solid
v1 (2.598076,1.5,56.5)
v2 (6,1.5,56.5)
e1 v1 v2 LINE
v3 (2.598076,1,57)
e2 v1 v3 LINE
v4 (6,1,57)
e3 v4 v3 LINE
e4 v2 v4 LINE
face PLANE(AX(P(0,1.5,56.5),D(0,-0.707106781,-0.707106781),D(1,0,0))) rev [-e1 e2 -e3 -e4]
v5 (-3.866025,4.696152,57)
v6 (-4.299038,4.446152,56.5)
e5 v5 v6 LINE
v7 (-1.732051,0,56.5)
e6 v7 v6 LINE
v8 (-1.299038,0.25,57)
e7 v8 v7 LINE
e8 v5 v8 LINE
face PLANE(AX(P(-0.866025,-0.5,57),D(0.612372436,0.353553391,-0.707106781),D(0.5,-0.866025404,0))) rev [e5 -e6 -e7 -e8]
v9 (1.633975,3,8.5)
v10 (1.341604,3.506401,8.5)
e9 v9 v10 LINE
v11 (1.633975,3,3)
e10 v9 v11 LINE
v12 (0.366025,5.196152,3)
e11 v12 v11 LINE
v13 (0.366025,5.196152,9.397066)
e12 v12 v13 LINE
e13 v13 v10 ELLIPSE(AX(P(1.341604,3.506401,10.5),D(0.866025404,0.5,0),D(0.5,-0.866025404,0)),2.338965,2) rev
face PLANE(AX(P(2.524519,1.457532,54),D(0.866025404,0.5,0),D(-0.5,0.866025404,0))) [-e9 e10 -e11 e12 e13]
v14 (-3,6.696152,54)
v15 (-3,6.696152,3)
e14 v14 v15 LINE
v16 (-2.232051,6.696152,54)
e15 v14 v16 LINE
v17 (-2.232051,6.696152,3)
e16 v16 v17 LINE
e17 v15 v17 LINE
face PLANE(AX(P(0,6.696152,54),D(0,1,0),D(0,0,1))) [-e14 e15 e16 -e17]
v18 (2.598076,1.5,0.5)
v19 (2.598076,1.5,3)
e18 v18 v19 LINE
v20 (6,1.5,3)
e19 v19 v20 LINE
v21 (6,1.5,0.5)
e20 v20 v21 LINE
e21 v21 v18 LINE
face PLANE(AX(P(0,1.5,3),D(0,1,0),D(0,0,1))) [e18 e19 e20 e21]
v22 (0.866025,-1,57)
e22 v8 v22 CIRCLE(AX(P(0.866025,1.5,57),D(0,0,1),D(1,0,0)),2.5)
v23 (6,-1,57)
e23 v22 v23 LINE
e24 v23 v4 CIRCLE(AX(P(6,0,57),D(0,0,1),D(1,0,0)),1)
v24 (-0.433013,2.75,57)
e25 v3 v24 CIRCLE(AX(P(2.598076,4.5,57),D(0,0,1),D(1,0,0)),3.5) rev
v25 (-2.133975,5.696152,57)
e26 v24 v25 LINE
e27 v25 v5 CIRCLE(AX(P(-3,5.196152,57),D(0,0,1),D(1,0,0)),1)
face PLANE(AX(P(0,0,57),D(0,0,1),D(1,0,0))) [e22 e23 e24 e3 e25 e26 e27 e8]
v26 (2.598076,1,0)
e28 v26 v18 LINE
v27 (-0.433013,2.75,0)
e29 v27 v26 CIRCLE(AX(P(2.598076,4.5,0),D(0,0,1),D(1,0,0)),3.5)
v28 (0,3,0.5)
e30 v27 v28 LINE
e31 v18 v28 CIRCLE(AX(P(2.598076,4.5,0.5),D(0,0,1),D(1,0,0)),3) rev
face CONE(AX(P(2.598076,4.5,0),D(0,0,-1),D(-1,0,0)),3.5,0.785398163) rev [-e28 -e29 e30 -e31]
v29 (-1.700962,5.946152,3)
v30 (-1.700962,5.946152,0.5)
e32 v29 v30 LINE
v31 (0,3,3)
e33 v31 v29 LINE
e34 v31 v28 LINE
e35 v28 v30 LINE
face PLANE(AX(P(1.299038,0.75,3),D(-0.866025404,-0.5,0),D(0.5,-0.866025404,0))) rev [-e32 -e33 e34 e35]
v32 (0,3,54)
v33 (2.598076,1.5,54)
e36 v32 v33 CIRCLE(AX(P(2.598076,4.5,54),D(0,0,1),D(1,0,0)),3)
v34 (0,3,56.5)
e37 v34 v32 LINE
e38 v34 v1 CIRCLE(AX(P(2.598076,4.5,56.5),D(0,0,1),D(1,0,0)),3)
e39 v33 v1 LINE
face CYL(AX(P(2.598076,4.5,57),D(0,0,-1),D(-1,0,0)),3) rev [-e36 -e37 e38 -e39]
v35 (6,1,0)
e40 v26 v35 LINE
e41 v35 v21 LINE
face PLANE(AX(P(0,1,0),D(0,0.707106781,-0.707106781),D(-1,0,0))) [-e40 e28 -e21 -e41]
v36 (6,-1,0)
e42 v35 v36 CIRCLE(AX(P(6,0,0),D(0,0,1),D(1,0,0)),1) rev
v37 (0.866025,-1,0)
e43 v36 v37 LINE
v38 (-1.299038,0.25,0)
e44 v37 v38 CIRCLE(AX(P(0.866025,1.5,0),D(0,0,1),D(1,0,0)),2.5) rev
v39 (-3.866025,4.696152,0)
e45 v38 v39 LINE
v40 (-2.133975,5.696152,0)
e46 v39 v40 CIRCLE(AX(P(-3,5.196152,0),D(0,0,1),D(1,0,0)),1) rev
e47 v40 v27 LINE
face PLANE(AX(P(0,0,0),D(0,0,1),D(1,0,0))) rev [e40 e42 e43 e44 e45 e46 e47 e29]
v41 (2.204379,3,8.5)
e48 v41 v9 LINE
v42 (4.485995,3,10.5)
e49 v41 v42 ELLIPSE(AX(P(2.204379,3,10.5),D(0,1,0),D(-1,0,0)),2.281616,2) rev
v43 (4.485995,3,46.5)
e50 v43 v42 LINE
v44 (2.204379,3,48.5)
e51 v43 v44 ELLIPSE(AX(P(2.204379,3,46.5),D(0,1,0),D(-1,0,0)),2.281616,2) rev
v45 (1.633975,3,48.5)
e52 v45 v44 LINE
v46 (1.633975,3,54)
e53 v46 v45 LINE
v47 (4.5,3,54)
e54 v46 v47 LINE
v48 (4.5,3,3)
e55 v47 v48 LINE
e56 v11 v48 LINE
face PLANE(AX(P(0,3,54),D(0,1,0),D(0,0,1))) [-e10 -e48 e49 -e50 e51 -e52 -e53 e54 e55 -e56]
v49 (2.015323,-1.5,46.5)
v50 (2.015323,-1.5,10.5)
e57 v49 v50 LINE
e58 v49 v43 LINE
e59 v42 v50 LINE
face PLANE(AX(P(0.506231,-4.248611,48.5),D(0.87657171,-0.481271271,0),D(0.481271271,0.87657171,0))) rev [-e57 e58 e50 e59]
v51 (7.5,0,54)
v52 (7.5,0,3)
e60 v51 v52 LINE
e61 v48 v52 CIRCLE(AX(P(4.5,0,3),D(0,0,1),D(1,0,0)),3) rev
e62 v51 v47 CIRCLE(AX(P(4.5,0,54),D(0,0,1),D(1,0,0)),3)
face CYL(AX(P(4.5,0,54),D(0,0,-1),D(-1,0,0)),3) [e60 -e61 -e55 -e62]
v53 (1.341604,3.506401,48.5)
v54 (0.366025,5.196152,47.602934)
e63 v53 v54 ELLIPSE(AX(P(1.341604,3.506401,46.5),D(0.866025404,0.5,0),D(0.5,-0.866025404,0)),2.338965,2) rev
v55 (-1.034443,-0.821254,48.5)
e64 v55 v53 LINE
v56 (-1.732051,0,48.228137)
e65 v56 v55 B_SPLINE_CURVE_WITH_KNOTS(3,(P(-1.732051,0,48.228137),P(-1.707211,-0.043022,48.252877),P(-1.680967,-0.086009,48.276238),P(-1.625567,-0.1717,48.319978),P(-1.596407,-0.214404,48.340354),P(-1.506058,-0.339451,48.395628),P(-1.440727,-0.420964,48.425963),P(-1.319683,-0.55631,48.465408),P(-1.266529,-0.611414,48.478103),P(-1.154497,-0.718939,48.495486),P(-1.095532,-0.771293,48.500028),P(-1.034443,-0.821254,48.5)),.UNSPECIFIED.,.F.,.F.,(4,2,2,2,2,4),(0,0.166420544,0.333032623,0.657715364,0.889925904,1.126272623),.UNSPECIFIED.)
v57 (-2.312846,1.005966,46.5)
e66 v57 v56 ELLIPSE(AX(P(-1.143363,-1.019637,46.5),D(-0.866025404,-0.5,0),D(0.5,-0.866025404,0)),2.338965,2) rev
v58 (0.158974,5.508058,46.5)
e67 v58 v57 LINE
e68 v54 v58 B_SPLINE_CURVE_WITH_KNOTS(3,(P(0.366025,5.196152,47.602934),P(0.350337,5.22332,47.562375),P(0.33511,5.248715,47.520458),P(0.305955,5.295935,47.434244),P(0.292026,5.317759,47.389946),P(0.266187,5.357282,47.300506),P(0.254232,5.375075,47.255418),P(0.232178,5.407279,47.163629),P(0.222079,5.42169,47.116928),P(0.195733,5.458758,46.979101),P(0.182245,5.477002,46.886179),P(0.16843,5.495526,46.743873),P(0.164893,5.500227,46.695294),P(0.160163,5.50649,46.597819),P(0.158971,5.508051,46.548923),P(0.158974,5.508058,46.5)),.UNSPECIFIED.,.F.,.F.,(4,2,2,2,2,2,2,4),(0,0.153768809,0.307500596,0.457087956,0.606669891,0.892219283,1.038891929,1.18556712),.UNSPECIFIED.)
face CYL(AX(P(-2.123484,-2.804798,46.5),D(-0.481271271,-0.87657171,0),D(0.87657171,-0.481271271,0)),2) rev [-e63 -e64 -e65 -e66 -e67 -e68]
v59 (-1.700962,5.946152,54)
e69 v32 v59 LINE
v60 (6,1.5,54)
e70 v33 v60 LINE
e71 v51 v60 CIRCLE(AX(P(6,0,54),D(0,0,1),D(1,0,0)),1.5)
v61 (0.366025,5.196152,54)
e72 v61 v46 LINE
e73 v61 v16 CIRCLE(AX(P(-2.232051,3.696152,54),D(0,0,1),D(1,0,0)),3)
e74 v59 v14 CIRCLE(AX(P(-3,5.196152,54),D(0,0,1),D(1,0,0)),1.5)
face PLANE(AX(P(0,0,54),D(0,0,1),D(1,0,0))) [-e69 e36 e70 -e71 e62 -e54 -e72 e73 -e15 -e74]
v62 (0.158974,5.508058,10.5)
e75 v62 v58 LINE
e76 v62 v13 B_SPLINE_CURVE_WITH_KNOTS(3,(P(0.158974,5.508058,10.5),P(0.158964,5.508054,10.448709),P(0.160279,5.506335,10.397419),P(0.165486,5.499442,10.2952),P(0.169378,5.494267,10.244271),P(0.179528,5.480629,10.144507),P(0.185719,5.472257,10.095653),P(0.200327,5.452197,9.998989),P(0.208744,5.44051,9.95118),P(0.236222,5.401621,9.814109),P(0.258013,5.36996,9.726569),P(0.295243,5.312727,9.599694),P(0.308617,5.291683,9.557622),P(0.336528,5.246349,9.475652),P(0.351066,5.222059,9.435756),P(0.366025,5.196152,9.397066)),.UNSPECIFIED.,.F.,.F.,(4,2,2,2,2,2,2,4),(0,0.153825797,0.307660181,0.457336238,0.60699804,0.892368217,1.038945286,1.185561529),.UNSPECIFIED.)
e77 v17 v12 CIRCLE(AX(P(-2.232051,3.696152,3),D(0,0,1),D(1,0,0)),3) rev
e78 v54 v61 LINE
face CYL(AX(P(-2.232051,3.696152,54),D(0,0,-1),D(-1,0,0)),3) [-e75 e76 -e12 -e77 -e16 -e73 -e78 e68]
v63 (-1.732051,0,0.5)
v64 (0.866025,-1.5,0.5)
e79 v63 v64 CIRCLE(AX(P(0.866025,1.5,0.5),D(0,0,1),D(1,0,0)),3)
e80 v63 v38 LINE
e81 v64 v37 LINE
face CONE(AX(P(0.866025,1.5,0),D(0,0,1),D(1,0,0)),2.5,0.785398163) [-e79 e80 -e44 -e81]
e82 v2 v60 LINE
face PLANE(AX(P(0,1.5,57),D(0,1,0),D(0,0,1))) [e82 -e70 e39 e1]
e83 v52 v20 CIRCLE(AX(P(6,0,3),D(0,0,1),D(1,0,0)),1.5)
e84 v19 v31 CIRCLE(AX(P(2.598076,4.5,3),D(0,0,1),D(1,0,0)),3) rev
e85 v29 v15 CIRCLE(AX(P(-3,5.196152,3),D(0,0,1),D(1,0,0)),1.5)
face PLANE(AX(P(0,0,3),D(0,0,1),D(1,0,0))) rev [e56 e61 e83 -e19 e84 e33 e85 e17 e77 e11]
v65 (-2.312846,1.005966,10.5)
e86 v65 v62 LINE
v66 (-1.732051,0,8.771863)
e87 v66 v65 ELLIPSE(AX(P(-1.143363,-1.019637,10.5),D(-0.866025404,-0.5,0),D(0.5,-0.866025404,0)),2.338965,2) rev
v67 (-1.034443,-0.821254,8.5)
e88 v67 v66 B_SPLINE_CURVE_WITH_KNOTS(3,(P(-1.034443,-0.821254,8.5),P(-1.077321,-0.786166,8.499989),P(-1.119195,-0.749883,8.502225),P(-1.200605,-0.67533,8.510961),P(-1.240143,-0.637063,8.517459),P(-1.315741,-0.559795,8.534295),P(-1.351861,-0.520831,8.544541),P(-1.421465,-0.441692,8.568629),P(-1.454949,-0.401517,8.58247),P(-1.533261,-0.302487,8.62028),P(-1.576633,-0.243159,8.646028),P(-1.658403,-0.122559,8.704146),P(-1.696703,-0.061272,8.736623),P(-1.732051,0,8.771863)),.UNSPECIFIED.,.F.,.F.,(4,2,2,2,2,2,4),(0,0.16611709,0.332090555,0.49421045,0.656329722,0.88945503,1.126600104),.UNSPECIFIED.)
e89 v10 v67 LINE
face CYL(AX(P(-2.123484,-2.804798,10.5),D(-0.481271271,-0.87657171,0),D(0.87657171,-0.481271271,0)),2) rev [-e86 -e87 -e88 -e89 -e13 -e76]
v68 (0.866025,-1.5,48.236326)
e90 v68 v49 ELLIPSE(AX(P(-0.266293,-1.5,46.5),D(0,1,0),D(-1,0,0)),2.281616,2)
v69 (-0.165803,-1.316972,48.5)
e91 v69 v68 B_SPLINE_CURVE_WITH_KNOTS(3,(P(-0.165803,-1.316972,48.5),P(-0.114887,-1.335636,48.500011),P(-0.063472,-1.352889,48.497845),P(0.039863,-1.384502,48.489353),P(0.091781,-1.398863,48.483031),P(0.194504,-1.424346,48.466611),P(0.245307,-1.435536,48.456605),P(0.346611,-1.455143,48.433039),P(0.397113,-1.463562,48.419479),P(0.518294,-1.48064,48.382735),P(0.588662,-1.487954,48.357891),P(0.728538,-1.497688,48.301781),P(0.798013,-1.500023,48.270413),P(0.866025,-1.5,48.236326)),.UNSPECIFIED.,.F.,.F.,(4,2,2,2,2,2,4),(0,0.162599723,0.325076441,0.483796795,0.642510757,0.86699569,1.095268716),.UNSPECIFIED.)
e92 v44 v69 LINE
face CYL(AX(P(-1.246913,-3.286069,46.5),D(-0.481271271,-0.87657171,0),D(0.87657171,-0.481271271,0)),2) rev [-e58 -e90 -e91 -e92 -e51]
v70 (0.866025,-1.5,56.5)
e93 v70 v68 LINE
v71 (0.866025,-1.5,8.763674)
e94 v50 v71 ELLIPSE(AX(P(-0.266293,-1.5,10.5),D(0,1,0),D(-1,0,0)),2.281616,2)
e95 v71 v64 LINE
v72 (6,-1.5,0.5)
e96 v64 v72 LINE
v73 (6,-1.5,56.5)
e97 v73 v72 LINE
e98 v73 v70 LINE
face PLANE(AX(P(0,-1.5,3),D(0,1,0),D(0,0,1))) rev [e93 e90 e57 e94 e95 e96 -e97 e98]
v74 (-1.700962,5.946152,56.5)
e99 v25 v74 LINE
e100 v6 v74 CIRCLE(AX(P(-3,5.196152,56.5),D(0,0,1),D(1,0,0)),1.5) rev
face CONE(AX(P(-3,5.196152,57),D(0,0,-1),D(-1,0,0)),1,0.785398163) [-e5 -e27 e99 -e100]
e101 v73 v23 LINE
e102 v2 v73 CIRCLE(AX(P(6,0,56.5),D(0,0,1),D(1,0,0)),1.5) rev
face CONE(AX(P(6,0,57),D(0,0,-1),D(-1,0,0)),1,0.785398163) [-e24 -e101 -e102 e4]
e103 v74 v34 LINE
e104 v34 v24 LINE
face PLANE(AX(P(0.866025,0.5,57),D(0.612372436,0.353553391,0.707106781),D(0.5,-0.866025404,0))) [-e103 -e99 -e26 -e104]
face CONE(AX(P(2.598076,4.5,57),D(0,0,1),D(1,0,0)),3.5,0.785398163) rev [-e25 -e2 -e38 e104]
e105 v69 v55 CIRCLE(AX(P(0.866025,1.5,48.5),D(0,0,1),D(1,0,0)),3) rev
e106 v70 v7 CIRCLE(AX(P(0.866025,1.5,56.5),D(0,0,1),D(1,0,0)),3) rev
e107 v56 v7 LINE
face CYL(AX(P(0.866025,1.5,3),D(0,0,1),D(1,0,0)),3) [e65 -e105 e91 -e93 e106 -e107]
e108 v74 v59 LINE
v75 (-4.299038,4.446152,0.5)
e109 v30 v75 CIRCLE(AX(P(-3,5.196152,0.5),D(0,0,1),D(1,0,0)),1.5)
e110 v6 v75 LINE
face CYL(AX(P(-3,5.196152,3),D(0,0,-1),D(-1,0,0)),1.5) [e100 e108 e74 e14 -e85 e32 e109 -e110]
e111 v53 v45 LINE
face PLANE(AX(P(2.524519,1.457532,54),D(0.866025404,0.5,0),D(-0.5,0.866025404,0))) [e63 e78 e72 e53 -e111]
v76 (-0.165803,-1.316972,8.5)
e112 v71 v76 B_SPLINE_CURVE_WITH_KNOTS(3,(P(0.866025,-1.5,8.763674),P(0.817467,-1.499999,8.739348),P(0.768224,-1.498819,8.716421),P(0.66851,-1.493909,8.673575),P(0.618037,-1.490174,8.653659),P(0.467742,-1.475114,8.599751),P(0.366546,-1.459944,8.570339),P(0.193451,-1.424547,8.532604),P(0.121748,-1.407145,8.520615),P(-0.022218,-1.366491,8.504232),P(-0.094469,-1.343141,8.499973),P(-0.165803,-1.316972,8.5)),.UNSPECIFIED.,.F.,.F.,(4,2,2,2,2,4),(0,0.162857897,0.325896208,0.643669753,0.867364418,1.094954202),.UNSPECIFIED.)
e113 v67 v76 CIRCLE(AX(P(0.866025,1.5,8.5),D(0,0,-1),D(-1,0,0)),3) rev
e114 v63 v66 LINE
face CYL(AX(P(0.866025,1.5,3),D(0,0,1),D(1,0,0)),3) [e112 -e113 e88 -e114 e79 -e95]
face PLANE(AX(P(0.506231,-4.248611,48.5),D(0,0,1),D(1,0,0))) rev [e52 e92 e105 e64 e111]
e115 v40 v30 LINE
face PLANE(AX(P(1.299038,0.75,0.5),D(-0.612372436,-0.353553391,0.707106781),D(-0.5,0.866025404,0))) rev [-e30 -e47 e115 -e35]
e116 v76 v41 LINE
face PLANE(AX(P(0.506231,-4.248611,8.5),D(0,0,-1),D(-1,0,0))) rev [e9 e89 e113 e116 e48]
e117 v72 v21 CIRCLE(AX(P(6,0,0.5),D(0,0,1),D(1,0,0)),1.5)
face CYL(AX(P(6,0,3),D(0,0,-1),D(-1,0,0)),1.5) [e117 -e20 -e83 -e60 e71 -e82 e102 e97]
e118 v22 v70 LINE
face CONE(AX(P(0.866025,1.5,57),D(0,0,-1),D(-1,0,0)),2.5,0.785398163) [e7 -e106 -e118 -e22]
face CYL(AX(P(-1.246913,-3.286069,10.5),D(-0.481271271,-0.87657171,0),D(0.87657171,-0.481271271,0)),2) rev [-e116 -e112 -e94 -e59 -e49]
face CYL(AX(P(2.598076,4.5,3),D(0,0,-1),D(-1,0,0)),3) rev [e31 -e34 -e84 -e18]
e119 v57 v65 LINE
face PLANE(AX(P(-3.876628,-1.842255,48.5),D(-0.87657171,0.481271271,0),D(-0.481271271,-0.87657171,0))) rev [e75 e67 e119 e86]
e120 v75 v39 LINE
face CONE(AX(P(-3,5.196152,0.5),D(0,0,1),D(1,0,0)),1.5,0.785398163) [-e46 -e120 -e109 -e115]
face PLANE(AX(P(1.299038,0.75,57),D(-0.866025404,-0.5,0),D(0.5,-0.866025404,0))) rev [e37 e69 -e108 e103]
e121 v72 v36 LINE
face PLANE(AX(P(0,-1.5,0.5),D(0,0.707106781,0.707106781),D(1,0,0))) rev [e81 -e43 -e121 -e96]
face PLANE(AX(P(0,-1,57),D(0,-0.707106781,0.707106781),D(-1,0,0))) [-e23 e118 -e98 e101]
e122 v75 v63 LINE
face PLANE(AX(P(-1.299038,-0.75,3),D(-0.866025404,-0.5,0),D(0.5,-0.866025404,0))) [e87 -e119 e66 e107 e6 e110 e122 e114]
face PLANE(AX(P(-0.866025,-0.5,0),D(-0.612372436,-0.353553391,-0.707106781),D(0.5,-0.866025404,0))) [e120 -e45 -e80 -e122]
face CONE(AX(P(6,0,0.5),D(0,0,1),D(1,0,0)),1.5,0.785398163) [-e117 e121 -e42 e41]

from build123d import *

# Parameters (mm, degrees)
EXTRUDE_1_DEPTH     = 3
EXTRUDE_2_DEPTH     = 51
EXTRUDE_3_DEPTH     = 3
FILLET_1_R          = 3
CHAMFER_1_SIZE      = 0.5
SKETCH_4_W          = 5
SKETCH_4_H          = 40
CUT_EXTRUDE_1_DEPTH = 58.742047602
FILLET_2_R          = 2


with BuildPart() as part:
    # 草图1 → 凸台-拉伸1 (new body)
    with BuildSketch(Plane.XY):
        with BuildLine():
            Line((-4.299038106, 4.446152423), (-0.866025404, -1.5))
            Line((-0.866025404, -1.5), (6, -1.5))
            ThreePointArc((6, -1.5), (7.5, 0), (6, 1.5))
            Line((6, 1.5), (0.866025404, 1.5))
            Line((0.866025404, 1.5), (-1.700961894, 5.946152423))
            ThreePointArc((-1.700961894, 5.946152423), (-3.75, 6.495190528), (-4.299038106, 4.446152423))
        make_face()
    extrude(amount=EXTRUDE_1_DEPTH)

    # 草图2 → 凸台-拉伸2 (add)
    with BuildSketch(Plane.XY.offset(3)):
        with BuildLine():
            Line((-0.5, 6.696152423), (-3, 6.696152423))
            ThreePointArc((-3, 6.696152423), (-2.25, 6.495190528), (-1.700961894, 5.946152423))
            Line((-1.700961894, 5.946152423), (0.866025404, 1.5))
            Line((0.866025404, 1.5), (6, 1.5))
            ThreePointArc((6, 1.5), (7.060660172, 1.060660172), (7.5, 0))
            Line((7.5, 0), (7.5, 3))
            Line((7.5, 3), (1.633974596, 3))
            Line((1.633974596, 3), (-0.5, 6.696152423))
        make_face()
        with BuildLine():
            Line((-4.299038106, 4.446152423), (-0.866025404, -1.5))
            Line((-0.866025404, -1.5), (6, -1.5))
            ThreePointArc((6, -1.5), (7.060660172, -1.060660172), (7.5, 0))
            ThreePointArc((7.5, 0), (7.060660172, 1.060660172), (6, 1.5))
            Line((6, 1.5), (0.866025404, 1.5))
            Line((0.866025404, 1.5), (-1.700961894, 5.946152423))
            ThreePointArc((-1.700961894, 5.946152423), (-1.551111261, 5.58438099), (-1.5, 5.196152423))
            ThreePointArc((-1.5, 5.196152423), (-2.611771432, 3.747263683), (-4.299038106, 4.446152423))
        make_face()
        with BuildLine():
            ThreePointArc((-3, 6.696152423), (-4.299038106, 5.946152423), (-4.299038106, 4.446152423))
            ThreePointArc((-4.299038106, 4.446152423), (-2.611771432, 3.747263683), (-1.5, 5.196152423))
            ThreePointArc((-1.5, 5.196152423), (-1.551111261, 5.58438099), (-1.700961894, 5.946152423))
            ThreePointArc((-1.700961894, 5.946152423), (-2.25, 6.495190528), (-3, 6.696152423))
        make_face()
    extrude(amount=EXTRUDE_2_DEPTH)

    # 草图3 → 凸台-拉伸3 (add)
    with BuildSketch(Plane.XY.offset(54)):
        with BuildLine():
            Line((-4.299038106, 4.446152423), (-0.866025404, -1.5))
            Line((-0.866025404, -1.5), (6, -1.5))
            ThreePointArc((6, -1.5), (7.5, 0), (6, 1.5))
            Line((6, 1.5), (0.866025404, 1.5))
            Line((0.866025404, 1.5), (-1.700961894, 5.946152423))
            ThreePointArc((-1.700961894, 5.946152423), (-3.75, 6.495190528), (-4.299038106, 4.446152423))
        make_face()
    extrude(amount=EXTRUDE_3_DEPTH)

    # 圆角1
    fillet_1_edges = [part.edges().sort_by_distance(p)[0] for p in [
        (0.866025404, 1.5, 55.5),
        (7.5, 3, 28.5),
        (-0.5, 6.696152423, 28.5),
        (0.866025404, 1.5, 1.5),
        (-0.866025404, -1.5, 28.5),
    ]]
    fillet(fillet_1_edges, radius=FILLET_1_R - 0.0001)  # a hair under: the kernel refuses the full size

    # 倒角1
    chamfer_1_edges = [part.edges().sort_by_distance(p)[0] for p in [
        (7.5, 0, 57),
        (-3.75, 6.495190528, 57),
        (-3.015530023, 2.223051211, 57),
        (-0.850466513, 4.473051211, 57),
        (4.299009238, 1.5, 57),
        (-3.75, 6.495190528, 0),
        (-0.850466513, 4.473051211, 0),
        (4.299009238, 1.5, 0),
        (3.432983834, -1.5, 0),
        (3.432983834, -1.5, 57),
        (-3.015530023, 2.223051211, 0),
        (-0.633982331, -1.098089609, 0),
        (-0.633982331, -1.098089609, 57),
        (1.098068476, 1.901910391, 57),
        (1.098068476, 1.901910391, 0),
        (7.5, 0, 0),
    ]]
    chamfer(chamfer_1_edges, length=CHAMFER_1_SIZE)

    # 草图4 → 切除-拉伸1 (cut, through all)
    with BuildSketch(Plane(origin=(2.486112979, 4.528124648, 0), x_dir=(0.8765717103484919, -0.4812712713394804, 0), z_dir=(0.4812712713394804, 0.8765717103484919, 0))):
        with Locations((-0.011517908, -28.5)):
            Rectangle(SKETCH_4_W, SKETCH_4_H)
    extrude(amount=-CUT_EXTRUDE_1_DEPTH, mode=Mode.SUBTRACT)

    # 圆角2
    fillet_2_edges = [part.edges().sort_by_distance(p)[0] for p in [
        (-1.076934244, 3.257015136, 48.5),
        (3.250658802, 0.75, 48.5),
        (-1.076934244, 3.257015136, 8.5),
        (3.250658802, 0.75, 8.5),
    ]]
    fillet(fillet_2_edges, radius=FILLET_2_R)


solid = part.part
